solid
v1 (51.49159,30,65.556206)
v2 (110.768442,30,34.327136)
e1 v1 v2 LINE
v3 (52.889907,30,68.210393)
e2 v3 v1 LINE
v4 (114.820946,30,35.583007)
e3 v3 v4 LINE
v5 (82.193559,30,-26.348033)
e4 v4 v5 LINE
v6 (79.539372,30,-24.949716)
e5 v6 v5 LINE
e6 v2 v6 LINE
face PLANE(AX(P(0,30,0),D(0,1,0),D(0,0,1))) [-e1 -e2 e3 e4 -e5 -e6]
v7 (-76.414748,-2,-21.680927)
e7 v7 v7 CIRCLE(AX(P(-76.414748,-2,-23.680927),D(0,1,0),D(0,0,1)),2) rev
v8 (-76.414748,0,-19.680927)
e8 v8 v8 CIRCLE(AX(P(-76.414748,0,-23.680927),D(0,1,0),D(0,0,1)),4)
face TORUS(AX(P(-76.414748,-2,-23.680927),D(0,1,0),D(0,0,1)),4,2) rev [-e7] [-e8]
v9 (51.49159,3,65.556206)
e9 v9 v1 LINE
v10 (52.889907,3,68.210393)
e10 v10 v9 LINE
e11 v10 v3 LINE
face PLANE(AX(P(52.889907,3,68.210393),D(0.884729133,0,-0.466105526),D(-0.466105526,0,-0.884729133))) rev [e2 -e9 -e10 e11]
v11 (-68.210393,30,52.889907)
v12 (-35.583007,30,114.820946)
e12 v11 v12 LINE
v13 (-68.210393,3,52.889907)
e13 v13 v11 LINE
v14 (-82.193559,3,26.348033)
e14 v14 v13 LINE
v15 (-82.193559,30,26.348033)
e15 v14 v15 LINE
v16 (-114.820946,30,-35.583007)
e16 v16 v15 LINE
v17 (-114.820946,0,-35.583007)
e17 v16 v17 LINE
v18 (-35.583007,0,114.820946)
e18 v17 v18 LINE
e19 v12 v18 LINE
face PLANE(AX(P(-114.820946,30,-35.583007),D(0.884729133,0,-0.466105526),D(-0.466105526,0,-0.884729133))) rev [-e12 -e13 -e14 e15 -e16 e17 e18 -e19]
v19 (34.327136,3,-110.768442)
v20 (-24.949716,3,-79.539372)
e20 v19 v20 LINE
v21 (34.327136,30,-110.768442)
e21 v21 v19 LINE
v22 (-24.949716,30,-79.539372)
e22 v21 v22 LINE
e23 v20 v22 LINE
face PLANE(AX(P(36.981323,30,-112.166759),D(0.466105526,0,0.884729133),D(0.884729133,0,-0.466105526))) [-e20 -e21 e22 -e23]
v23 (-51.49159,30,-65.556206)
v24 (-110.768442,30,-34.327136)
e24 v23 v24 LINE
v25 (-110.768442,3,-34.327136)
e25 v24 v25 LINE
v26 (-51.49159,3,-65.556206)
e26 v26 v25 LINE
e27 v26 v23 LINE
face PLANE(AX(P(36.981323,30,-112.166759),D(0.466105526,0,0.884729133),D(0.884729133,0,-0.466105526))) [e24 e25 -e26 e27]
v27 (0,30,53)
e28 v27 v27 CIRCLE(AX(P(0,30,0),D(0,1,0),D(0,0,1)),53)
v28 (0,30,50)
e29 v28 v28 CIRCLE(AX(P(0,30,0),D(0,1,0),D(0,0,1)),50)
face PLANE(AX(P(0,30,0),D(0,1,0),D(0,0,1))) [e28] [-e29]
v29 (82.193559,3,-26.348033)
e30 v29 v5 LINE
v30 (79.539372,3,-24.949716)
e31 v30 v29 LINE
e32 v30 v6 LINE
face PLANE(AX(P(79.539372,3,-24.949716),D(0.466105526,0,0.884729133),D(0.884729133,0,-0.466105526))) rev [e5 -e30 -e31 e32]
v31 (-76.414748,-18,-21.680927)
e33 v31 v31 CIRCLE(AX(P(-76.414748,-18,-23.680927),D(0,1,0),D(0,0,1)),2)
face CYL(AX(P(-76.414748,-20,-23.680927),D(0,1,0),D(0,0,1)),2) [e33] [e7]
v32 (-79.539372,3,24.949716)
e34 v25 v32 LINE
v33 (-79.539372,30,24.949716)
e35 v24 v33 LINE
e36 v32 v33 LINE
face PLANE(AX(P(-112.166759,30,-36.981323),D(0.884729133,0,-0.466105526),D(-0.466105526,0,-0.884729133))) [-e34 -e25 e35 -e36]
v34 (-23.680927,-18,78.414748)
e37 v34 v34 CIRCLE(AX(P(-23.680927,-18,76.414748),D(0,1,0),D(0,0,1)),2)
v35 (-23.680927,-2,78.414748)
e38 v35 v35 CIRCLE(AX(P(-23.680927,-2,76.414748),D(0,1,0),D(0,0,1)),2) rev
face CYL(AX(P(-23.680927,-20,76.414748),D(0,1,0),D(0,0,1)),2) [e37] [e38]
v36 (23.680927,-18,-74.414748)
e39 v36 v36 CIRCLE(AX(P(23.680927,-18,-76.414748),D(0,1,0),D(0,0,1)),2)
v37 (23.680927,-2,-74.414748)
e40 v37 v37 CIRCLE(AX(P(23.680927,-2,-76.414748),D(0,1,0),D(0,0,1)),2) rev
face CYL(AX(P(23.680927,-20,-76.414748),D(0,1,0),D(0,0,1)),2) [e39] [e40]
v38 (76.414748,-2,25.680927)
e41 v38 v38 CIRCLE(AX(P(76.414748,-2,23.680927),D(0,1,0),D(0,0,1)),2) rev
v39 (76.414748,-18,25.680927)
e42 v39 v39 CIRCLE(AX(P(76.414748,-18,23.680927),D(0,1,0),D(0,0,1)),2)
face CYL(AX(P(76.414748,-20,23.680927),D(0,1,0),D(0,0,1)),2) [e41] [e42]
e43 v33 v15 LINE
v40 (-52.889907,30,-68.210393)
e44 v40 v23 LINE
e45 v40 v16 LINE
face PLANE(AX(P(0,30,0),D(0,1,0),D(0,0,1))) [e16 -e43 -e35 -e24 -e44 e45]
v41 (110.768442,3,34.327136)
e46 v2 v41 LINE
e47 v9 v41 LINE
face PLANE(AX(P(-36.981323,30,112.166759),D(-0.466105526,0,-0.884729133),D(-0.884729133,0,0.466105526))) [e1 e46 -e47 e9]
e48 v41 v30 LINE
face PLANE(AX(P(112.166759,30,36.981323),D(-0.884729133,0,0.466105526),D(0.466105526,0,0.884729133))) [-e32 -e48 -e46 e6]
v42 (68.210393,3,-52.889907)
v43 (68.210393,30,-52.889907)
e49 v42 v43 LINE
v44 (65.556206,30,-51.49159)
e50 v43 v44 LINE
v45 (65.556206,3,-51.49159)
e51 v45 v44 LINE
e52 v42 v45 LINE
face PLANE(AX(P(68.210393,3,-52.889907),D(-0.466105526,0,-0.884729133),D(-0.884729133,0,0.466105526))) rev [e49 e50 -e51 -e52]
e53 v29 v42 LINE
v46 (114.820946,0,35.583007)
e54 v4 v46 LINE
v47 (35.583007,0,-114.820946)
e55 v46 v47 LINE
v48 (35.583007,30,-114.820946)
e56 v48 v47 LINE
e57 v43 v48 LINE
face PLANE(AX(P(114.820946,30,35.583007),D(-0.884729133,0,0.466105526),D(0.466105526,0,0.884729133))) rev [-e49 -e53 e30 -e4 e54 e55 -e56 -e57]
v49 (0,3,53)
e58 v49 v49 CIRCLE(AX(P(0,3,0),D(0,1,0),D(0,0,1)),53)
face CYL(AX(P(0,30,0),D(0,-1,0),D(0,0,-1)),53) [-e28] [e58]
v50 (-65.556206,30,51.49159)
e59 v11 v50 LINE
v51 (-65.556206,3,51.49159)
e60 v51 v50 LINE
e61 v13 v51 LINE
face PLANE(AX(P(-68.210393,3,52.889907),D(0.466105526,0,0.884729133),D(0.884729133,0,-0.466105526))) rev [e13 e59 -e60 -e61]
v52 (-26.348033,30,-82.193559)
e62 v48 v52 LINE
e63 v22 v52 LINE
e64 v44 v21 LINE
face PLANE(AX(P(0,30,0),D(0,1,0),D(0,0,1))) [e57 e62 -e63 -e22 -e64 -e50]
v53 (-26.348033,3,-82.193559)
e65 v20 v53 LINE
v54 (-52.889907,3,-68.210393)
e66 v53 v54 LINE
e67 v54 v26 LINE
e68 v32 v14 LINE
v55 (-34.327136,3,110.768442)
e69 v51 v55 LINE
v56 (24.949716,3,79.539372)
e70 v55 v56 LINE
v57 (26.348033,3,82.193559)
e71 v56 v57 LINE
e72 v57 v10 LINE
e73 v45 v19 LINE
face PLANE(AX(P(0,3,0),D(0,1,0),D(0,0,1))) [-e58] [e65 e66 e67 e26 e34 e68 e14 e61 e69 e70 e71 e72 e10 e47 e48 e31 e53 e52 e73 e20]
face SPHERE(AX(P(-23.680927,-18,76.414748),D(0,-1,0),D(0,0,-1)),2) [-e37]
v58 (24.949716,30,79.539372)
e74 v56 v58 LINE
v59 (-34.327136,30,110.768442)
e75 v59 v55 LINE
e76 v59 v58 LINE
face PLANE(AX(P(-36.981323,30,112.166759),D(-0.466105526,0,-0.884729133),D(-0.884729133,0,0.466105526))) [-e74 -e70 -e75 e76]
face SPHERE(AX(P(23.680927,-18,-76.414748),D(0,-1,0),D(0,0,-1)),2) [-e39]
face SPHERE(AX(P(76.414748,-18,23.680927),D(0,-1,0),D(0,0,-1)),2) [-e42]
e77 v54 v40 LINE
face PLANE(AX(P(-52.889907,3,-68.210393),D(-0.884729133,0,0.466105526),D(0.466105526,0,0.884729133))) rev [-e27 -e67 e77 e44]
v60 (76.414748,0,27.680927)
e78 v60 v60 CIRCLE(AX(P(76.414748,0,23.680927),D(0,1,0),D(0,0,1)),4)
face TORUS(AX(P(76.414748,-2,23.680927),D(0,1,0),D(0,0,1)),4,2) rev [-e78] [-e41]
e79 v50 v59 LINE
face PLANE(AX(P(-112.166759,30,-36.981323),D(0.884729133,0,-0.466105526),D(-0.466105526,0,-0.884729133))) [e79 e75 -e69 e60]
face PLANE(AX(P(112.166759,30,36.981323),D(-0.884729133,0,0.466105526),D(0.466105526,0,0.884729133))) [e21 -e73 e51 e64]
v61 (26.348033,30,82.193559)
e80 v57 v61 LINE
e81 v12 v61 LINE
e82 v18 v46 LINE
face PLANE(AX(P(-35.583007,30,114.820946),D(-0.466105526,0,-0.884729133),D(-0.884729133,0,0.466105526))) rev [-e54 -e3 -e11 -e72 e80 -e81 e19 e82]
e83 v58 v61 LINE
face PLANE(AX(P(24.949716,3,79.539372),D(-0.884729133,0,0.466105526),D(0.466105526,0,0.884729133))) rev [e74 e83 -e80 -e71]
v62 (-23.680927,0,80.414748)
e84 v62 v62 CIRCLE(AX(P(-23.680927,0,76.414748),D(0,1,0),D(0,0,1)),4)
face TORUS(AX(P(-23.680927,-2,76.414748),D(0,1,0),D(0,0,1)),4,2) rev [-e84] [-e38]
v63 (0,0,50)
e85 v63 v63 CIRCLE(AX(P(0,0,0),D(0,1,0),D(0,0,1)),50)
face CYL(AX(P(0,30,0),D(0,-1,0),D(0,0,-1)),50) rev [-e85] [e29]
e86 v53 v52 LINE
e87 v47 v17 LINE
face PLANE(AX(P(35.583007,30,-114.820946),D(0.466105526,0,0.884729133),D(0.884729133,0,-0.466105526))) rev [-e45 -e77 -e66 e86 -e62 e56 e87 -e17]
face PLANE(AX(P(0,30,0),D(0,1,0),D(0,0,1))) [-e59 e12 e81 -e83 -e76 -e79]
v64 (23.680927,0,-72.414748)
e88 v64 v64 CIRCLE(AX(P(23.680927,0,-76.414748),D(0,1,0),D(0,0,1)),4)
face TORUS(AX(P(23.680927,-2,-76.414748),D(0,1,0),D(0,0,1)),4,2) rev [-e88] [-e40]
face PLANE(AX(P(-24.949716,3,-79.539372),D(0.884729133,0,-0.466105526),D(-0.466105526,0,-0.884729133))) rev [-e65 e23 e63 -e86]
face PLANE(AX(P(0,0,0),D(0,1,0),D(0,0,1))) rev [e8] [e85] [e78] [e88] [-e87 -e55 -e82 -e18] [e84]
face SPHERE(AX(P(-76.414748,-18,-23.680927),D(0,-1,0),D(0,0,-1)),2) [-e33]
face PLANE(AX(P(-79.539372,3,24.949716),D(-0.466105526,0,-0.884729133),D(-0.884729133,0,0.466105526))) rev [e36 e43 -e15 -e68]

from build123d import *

# Parameters (mm, degrees)
SKETCH2_R           = 50
BOSS_EXTRUDE1_DEPTH = 30
SKETCH6_R           = 2
BOSS_EXTRUDE5_DEPTH = 20
FILLET2_R           = 2
SHELL1_START        = 3
SHELL1_OUTLINE_R    = 53
SHELL1_DEPTH        = 27
CUT_EXTRUDE3_DEPTH  = 27


# Read off the part's stored shape, not the designer's step: Shell1
with BuildPart() as part:
    # Sketch2 → Boss-Extrude1 (new body)
    with BuildSketch(Plane(origin=(0, 0, 0), x_dir=(1, 0, 0), z_dir=(0, 1, 0))):
        Polygon((-35.583006561, -114.820946016), (114.820946016, -35.583006561), (35.583006561, 114.820946016), (-114.820946016, 35.583006561), align=None)
        with Locations(Location((0, 0, 0), (0, 0, 270))):
            Circle(SKETCH2_R, mode=Mode.SUBTRACT)
    extrude(amount=BOSS_EXTRUDE1_DEPTH)

    # Sketch6 → Boss-Extrude5 (add)
    with BuildSketch(Plane(origin=(0, 0, 0), x_dir=(-1, 0, 0), z_dir=(0, -1, 0))):
        with Locations(Location((76.414747812, 23.680927279, 0), (0, 0, 270))):
            Circle(SKETCH6_R)
        with Locations(Location((23.680927279, -76.414747812, 0), (0, 0, 270))):
            Circle(SKETCH6_R)
        with Locations(Location((-76.414747812, -23.680927279, 0), (0, 0, 270))):
            Circle(SKETCH6_R)
        with Locations(Location((-23.680927279, 76.414747812, 0), (0, 0, 270))):
            Circle(SKETCH6_R)
    extrude(amount=BOSS_EXTRUDE5_DEPTH)

    # Fillet2
    fillet2_edges = [part.edges().sort_by_distance(p)[0] for p in [
        (-76.414747812, 0, -25.680927279),
        (-76.414747812, -20, -25.680927279),
        (23.680927279, 0, -78.414747812),
        (23.680927279, -20, -78.414747812),
        (76.414747812, 0, 21.680927279),
        (76.414747812, -20, 21.680927279),
        (-23.680927279, 0, 74.414747812),
        (-23.680927279, -20, 74.414747812),
    ]]
    fillet(fillet2_edges, radius=FILLET2_R)

    # Shell1 outline → Shell1 (cut)
    with BuildSketch(Plane(origin=(0, 0, 0), x_dir=(1, 0, 0), z_dir=(0, 1, 0)).offset(SHELL1_START)):
        Polygon((110.768442039, -34.327135741), (34.327135741, 110.768442039), (-110.768442039, 34.327135741), (-34.327135741, -110.768442039), align=None)
        Circle(SHELL1_OUTLINE_R, mode=Mode.SUBTRACT)
    extrude(amount=SHELL1_DEPTH, mode=Mode.SUBTRACT)

    # Sketch7 → Cut-Extrude3 (cut)
    with BuildSketch(Plane(origin=(0, 30, 0), x_dir=(1, 0, 0), z_dir=(0, 1, 0))):
        Polygon((79.539371783, 24.949716157), (82.193559182, 26.348032736), (68.210393395, 52.88990672), (65.556205997, 51.491590141), align=None)
        Polygon((51.491590141, -65.556205997), (24.949716157, -79.539371783), (26.348032736, -82.193559182), (52.88990672, -68.210393395), align=None)
        Polygon((-65.556205997, -51.491590141), (-79.539371783, -24.949716157), (-82.193559182, -26.348032736), (-68.210393395, -52.88990672), align=None)
        Polygon((-51.491590141, 65.556205997), (-24.949716157, 79.539371783), (-26.348032736, 82.193559182), (-52.88990672, 68.210393395), align=None)
    extrude(amount=-CUT_EXTRUDE3_DEPTH, mode=Mode.SUBTRACT)


solid = part.part
